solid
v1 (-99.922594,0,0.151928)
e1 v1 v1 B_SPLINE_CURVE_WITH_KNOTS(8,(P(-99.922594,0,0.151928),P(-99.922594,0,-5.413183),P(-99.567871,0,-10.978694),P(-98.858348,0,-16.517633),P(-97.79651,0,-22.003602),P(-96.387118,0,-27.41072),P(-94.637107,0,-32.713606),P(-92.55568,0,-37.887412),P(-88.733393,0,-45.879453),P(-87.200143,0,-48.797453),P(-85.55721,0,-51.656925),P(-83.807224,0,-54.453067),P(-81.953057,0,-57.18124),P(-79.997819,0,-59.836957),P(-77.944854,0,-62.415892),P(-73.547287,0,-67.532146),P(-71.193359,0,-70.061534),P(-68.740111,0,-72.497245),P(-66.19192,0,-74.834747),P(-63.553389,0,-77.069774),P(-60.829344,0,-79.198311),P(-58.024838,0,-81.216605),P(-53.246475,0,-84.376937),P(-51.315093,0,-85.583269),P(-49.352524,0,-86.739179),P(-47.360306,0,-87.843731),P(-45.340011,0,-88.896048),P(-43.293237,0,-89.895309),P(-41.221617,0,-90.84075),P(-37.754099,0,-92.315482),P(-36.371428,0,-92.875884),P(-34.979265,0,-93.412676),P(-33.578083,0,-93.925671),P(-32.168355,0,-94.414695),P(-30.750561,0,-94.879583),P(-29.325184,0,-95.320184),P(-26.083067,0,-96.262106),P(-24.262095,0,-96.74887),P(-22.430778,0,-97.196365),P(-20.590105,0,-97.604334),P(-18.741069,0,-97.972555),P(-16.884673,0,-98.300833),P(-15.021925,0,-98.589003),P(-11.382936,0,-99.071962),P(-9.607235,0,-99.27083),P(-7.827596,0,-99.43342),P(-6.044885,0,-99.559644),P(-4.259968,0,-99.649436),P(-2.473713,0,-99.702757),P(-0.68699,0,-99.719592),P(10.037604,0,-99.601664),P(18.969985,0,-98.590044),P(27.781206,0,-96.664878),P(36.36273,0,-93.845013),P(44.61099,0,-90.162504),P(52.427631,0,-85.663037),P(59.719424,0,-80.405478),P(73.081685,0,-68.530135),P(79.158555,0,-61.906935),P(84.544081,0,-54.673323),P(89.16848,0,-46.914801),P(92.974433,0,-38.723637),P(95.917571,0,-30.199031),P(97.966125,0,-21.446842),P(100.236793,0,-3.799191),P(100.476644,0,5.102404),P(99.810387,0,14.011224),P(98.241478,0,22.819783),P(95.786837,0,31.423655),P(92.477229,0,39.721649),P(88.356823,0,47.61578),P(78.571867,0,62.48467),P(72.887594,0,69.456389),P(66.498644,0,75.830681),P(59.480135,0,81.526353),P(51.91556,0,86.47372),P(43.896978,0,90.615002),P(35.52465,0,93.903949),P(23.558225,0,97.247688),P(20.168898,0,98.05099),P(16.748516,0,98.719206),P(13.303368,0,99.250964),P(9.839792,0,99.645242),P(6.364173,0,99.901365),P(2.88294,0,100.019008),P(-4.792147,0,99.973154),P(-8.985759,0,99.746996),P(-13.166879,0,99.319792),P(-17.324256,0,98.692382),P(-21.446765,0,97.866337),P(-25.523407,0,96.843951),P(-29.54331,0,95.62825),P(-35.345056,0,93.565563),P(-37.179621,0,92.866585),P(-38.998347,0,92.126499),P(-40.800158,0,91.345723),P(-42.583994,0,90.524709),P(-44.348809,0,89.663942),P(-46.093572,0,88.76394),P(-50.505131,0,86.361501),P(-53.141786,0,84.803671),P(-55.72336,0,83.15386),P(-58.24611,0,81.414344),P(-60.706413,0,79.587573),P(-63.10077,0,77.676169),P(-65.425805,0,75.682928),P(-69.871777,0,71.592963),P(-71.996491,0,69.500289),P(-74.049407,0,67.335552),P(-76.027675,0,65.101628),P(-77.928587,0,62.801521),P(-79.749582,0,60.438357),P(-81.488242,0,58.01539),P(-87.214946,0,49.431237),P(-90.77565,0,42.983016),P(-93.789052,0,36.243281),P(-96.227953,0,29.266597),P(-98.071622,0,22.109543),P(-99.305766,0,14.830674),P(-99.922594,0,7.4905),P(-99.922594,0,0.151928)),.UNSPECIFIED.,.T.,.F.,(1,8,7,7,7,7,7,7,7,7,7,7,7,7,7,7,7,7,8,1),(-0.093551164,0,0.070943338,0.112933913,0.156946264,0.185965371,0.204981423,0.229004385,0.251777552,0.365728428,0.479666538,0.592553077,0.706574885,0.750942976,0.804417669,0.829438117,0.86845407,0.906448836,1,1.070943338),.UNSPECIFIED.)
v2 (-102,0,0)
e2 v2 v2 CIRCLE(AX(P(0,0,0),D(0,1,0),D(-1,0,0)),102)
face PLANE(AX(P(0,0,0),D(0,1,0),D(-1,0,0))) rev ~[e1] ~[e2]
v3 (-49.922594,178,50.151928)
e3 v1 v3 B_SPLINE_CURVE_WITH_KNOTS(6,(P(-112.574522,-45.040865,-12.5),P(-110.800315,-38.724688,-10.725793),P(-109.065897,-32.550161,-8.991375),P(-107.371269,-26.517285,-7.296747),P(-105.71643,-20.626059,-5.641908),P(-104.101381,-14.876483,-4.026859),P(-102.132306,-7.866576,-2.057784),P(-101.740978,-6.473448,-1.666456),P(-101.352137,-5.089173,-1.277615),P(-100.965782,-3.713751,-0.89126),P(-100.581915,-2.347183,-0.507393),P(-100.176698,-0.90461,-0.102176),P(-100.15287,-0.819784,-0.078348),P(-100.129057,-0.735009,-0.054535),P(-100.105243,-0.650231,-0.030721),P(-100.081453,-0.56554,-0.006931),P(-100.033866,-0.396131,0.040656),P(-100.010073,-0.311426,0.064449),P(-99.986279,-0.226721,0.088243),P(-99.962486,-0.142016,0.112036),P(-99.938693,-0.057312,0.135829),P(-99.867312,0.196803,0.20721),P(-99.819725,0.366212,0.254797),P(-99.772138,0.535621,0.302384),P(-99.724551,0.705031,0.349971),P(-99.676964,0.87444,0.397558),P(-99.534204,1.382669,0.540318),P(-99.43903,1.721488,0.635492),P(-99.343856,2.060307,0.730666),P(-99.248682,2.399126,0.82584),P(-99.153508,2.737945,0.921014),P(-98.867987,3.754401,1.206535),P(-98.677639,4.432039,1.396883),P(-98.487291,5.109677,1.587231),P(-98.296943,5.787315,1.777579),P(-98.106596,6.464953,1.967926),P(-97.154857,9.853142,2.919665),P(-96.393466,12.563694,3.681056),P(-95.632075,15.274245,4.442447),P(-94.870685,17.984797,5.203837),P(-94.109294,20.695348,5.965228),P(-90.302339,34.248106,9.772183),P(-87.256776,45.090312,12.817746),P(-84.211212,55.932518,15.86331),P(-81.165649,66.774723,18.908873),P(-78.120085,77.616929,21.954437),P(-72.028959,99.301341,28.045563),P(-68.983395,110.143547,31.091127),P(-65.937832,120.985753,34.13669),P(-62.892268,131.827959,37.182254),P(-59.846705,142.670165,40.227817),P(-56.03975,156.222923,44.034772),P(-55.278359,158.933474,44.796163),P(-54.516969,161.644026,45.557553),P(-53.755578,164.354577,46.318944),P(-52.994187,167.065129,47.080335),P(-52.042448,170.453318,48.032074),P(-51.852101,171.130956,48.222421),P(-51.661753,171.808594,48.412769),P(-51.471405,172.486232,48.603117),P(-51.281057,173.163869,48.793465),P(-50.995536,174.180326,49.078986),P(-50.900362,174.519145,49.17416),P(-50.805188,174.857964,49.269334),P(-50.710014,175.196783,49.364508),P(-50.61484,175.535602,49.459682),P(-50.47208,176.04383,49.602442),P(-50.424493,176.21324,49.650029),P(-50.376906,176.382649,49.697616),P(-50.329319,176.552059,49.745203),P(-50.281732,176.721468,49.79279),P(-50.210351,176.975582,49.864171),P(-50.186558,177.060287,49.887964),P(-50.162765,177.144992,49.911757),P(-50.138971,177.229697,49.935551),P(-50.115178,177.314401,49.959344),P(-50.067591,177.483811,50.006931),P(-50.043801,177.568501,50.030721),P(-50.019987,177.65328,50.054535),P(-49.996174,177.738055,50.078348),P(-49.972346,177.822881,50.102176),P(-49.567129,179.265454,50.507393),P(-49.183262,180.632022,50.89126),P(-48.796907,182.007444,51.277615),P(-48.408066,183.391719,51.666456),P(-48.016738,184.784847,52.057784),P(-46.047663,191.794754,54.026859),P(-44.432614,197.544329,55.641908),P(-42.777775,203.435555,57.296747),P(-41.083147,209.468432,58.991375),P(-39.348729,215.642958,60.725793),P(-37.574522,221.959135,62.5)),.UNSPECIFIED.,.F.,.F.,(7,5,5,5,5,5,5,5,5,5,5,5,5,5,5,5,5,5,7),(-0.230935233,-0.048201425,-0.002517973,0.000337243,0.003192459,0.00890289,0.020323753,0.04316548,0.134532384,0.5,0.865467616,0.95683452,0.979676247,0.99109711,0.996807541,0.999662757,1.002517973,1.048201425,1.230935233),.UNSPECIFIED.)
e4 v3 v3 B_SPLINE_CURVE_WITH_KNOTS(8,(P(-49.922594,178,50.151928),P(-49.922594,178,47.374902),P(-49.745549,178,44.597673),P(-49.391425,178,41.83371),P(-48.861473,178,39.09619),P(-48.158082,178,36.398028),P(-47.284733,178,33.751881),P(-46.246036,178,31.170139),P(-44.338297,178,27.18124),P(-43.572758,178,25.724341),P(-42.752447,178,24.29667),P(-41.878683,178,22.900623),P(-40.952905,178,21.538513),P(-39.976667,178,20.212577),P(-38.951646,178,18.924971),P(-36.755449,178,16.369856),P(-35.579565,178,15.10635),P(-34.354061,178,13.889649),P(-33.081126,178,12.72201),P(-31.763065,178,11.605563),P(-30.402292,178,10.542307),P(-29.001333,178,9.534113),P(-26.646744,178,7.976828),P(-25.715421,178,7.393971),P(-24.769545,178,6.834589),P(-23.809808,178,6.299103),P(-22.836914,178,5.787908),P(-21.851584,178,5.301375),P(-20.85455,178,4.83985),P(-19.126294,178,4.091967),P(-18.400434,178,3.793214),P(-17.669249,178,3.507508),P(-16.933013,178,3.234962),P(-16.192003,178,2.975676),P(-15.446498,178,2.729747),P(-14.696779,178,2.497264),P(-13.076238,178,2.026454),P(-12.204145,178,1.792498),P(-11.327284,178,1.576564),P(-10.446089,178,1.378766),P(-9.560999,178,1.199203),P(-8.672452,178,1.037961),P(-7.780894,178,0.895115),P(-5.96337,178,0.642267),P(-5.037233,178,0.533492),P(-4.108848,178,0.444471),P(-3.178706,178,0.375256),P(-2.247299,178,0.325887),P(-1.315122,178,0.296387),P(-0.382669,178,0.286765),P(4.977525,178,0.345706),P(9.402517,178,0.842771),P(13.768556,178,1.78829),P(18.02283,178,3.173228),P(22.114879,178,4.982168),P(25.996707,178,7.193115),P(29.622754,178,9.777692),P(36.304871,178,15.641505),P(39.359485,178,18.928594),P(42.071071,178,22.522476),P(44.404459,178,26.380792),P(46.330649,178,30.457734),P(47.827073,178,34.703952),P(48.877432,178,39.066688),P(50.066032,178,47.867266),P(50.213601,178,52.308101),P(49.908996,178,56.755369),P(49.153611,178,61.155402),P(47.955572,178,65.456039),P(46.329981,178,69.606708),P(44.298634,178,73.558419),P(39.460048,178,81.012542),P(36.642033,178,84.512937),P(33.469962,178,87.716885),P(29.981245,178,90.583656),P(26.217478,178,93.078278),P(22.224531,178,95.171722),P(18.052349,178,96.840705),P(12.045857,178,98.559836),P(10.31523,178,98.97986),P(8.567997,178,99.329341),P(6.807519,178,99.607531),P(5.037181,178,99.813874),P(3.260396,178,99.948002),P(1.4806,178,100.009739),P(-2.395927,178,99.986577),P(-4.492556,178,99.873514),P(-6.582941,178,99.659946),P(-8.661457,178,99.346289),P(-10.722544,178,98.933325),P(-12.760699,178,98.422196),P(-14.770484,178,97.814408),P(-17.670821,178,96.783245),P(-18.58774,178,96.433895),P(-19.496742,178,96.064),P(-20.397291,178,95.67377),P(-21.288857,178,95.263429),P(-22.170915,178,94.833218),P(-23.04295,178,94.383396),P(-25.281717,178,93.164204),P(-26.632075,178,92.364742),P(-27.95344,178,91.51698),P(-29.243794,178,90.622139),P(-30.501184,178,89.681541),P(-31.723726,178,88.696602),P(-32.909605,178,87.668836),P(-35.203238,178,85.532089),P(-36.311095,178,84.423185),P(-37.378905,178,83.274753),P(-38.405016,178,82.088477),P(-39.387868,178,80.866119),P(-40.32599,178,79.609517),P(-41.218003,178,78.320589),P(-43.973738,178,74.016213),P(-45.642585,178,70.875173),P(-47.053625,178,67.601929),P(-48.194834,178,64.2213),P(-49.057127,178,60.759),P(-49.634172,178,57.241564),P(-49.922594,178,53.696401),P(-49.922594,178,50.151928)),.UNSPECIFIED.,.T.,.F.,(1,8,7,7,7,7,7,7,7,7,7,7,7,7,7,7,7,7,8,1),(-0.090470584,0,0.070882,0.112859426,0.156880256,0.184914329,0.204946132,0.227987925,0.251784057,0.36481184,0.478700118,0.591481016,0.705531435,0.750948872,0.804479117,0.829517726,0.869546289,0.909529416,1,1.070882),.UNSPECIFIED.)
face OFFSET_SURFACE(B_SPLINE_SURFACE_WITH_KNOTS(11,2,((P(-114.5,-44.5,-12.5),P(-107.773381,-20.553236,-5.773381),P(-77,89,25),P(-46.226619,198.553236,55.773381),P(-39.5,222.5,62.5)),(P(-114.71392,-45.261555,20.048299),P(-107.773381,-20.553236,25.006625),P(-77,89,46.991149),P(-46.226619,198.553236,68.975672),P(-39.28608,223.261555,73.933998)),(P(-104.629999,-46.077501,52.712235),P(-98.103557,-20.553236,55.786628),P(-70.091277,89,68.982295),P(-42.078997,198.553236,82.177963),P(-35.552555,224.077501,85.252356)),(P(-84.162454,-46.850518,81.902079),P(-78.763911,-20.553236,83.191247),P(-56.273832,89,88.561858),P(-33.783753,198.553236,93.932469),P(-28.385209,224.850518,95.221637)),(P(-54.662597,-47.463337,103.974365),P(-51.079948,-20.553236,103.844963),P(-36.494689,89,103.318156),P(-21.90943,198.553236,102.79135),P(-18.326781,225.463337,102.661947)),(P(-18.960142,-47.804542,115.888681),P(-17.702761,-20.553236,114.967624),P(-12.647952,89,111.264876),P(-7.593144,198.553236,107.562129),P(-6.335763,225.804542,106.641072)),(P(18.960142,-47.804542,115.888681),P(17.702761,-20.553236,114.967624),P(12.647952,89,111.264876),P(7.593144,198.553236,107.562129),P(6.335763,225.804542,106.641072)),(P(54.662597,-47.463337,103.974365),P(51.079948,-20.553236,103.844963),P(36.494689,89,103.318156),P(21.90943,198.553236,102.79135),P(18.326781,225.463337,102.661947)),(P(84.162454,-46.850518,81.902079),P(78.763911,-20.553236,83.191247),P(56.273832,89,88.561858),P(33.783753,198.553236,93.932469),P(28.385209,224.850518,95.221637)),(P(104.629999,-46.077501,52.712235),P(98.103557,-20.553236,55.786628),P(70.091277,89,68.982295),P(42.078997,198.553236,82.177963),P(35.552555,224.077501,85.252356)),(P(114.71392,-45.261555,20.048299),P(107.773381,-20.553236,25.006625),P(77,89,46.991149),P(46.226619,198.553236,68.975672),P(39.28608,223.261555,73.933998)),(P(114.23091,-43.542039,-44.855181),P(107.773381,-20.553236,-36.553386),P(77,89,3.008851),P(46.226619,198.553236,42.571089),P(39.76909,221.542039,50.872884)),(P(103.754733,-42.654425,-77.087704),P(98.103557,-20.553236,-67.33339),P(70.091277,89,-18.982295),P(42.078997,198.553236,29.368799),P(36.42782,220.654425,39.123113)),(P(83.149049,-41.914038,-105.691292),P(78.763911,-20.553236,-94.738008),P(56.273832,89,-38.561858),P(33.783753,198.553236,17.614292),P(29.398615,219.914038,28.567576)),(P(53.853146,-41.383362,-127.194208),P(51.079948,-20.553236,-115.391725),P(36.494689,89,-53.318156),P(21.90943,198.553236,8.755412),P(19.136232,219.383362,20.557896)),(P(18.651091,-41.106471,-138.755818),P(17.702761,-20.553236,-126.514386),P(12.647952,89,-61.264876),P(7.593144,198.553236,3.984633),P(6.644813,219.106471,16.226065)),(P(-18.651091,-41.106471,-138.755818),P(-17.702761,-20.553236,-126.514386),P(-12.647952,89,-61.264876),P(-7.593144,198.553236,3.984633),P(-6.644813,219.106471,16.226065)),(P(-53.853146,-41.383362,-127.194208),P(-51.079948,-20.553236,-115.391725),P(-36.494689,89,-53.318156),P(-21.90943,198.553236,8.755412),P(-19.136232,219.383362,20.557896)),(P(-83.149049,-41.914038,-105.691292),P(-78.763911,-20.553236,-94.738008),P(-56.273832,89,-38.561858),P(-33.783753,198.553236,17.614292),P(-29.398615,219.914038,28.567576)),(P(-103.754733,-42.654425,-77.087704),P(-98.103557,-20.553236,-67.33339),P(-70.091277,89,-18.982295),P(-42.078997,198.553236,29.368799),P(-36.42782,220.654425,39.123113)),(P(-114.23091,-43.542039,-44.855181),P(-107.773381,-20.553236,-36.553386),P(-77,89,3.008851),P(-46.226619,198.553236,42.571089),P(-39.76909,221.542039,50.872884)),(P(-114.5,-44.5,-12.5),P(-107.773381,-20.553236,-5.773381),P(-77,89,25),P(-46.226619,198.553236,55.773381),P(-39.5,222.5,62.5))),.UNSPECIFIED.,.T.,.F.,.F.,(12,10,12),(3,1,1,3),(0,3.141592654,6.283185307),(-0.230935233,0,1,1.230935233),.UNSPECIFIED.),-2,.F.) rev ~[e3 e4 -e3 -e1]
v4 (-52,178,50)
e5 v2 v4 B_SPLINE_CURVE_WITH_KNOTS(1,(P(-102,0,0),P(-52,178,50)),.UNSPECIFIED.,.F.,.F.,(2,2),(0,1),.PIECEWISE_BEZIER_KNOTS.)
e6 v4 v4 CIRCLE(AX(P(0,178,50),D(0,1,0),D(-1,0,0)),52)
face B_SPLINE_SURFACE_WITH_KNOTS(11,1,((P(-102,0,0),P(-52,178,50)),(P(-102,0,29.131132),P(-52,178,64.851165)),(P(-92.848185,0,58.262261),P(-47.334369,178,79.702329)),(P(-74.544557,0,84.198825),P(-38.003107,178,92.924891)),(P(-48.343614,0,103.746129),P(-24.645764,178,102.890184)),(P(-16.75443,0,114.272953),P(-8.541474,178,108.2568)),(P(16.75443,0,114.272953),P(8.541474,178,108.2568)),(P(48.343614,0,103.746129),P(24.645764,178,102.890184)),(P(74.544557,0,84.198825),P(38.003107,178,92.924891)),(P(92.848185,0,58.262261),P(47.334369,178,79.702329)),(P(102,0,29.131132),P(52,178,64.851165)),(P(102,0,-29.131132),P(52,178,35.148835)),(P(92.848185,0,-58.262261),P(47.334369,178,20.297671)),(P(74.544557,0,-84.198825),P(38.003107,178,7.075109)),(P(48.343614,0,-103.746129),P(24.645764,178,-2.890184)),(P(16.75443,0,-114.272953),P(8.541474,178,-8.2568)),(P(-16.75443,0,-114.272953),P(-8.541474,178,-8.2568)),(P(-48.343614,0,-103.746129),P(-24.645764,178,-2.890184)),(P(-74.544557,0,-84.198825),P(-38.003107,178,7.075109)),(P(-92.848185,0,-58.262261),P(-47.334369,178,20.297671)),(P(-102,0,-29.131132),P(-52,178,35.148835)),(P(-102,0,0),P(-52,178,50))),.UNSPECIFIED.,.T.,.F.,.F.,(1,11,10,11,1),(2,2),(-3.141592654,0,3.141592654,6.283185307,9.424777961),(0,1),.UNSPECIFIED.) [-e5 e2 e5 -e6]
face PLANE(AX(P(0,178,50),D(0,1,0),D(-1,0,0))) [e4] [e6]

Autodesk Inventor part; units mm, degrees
ref_plane "YZ Plane" through (0, 0, 0) normal (1, 0, 0) x (0, 1, 0)
ref_plane "XY Plane" through (0, 0, 0) normal (0, 0, 1) x (1, 0, 0)
sketch "Szkic6" plane through (0, 0, 0) normal (0, 1, 0) x (-1, 0, 0)
  circle A0 centre (0, 0) radius 102
  dimension "d33" = 204
ref_plane "Płaszczyzna konstrukcyjna1" through (0, 178, 0) normal (0, 1, 0) x (-1, 0, 0)
sketch "Szkic7" plane through (0, 178, 0) normal (0, 1, 0) x (-1, 0, 0)
  circle A0 centre (0, 50) radius 52
  line L0 (0, -20.3) -> (0, 20.3) construction
  circle A1 centre (0, 0) radius 102 construction
  dimension "d35" = 104
loft "Wyciągnięcie złożone1" add profiles "Szkic6", "Szkic7"
shell "Skorupa1" thickness 2 removed faces 2 at (13.236, 178, 37.6822) at (-13.1975, 0, 28.9105)
equation "\"d33\" = OD1"
equation "\"d35\" = OD2"
equation "\"d52\" = THK"
equation "\"SzerokośćGięciaPodcięcia\" = Grubość"
equation "\"RozmiarPodcięciaNarożnika\" = 4 * Grubość"
equation "\"PromieńPrzejścia\" = PromieńGięcia"
equation "\"Rozmiar_promienia_Jacobiego\" = PromieńGięcia"
equation "\"Wielk_odstępu\" = Grubość"
equation "\"d2\" = PromieńGięcia"
equation "\"d23\" = PromieńGięcia"
equation "\"OD1\" = 204"
equation "\"OD2\" = 104"
equation "\"L\" = 178"
equation "\"THK\" = 2"
equation "\"d34\" = L"
equation "\"Grubość\" = 1.5"
equation "\"PromieńGięcia\" = 3"
properties part number "Redukcja asymetryczna Ø204x104x2 L=178" material "304"
